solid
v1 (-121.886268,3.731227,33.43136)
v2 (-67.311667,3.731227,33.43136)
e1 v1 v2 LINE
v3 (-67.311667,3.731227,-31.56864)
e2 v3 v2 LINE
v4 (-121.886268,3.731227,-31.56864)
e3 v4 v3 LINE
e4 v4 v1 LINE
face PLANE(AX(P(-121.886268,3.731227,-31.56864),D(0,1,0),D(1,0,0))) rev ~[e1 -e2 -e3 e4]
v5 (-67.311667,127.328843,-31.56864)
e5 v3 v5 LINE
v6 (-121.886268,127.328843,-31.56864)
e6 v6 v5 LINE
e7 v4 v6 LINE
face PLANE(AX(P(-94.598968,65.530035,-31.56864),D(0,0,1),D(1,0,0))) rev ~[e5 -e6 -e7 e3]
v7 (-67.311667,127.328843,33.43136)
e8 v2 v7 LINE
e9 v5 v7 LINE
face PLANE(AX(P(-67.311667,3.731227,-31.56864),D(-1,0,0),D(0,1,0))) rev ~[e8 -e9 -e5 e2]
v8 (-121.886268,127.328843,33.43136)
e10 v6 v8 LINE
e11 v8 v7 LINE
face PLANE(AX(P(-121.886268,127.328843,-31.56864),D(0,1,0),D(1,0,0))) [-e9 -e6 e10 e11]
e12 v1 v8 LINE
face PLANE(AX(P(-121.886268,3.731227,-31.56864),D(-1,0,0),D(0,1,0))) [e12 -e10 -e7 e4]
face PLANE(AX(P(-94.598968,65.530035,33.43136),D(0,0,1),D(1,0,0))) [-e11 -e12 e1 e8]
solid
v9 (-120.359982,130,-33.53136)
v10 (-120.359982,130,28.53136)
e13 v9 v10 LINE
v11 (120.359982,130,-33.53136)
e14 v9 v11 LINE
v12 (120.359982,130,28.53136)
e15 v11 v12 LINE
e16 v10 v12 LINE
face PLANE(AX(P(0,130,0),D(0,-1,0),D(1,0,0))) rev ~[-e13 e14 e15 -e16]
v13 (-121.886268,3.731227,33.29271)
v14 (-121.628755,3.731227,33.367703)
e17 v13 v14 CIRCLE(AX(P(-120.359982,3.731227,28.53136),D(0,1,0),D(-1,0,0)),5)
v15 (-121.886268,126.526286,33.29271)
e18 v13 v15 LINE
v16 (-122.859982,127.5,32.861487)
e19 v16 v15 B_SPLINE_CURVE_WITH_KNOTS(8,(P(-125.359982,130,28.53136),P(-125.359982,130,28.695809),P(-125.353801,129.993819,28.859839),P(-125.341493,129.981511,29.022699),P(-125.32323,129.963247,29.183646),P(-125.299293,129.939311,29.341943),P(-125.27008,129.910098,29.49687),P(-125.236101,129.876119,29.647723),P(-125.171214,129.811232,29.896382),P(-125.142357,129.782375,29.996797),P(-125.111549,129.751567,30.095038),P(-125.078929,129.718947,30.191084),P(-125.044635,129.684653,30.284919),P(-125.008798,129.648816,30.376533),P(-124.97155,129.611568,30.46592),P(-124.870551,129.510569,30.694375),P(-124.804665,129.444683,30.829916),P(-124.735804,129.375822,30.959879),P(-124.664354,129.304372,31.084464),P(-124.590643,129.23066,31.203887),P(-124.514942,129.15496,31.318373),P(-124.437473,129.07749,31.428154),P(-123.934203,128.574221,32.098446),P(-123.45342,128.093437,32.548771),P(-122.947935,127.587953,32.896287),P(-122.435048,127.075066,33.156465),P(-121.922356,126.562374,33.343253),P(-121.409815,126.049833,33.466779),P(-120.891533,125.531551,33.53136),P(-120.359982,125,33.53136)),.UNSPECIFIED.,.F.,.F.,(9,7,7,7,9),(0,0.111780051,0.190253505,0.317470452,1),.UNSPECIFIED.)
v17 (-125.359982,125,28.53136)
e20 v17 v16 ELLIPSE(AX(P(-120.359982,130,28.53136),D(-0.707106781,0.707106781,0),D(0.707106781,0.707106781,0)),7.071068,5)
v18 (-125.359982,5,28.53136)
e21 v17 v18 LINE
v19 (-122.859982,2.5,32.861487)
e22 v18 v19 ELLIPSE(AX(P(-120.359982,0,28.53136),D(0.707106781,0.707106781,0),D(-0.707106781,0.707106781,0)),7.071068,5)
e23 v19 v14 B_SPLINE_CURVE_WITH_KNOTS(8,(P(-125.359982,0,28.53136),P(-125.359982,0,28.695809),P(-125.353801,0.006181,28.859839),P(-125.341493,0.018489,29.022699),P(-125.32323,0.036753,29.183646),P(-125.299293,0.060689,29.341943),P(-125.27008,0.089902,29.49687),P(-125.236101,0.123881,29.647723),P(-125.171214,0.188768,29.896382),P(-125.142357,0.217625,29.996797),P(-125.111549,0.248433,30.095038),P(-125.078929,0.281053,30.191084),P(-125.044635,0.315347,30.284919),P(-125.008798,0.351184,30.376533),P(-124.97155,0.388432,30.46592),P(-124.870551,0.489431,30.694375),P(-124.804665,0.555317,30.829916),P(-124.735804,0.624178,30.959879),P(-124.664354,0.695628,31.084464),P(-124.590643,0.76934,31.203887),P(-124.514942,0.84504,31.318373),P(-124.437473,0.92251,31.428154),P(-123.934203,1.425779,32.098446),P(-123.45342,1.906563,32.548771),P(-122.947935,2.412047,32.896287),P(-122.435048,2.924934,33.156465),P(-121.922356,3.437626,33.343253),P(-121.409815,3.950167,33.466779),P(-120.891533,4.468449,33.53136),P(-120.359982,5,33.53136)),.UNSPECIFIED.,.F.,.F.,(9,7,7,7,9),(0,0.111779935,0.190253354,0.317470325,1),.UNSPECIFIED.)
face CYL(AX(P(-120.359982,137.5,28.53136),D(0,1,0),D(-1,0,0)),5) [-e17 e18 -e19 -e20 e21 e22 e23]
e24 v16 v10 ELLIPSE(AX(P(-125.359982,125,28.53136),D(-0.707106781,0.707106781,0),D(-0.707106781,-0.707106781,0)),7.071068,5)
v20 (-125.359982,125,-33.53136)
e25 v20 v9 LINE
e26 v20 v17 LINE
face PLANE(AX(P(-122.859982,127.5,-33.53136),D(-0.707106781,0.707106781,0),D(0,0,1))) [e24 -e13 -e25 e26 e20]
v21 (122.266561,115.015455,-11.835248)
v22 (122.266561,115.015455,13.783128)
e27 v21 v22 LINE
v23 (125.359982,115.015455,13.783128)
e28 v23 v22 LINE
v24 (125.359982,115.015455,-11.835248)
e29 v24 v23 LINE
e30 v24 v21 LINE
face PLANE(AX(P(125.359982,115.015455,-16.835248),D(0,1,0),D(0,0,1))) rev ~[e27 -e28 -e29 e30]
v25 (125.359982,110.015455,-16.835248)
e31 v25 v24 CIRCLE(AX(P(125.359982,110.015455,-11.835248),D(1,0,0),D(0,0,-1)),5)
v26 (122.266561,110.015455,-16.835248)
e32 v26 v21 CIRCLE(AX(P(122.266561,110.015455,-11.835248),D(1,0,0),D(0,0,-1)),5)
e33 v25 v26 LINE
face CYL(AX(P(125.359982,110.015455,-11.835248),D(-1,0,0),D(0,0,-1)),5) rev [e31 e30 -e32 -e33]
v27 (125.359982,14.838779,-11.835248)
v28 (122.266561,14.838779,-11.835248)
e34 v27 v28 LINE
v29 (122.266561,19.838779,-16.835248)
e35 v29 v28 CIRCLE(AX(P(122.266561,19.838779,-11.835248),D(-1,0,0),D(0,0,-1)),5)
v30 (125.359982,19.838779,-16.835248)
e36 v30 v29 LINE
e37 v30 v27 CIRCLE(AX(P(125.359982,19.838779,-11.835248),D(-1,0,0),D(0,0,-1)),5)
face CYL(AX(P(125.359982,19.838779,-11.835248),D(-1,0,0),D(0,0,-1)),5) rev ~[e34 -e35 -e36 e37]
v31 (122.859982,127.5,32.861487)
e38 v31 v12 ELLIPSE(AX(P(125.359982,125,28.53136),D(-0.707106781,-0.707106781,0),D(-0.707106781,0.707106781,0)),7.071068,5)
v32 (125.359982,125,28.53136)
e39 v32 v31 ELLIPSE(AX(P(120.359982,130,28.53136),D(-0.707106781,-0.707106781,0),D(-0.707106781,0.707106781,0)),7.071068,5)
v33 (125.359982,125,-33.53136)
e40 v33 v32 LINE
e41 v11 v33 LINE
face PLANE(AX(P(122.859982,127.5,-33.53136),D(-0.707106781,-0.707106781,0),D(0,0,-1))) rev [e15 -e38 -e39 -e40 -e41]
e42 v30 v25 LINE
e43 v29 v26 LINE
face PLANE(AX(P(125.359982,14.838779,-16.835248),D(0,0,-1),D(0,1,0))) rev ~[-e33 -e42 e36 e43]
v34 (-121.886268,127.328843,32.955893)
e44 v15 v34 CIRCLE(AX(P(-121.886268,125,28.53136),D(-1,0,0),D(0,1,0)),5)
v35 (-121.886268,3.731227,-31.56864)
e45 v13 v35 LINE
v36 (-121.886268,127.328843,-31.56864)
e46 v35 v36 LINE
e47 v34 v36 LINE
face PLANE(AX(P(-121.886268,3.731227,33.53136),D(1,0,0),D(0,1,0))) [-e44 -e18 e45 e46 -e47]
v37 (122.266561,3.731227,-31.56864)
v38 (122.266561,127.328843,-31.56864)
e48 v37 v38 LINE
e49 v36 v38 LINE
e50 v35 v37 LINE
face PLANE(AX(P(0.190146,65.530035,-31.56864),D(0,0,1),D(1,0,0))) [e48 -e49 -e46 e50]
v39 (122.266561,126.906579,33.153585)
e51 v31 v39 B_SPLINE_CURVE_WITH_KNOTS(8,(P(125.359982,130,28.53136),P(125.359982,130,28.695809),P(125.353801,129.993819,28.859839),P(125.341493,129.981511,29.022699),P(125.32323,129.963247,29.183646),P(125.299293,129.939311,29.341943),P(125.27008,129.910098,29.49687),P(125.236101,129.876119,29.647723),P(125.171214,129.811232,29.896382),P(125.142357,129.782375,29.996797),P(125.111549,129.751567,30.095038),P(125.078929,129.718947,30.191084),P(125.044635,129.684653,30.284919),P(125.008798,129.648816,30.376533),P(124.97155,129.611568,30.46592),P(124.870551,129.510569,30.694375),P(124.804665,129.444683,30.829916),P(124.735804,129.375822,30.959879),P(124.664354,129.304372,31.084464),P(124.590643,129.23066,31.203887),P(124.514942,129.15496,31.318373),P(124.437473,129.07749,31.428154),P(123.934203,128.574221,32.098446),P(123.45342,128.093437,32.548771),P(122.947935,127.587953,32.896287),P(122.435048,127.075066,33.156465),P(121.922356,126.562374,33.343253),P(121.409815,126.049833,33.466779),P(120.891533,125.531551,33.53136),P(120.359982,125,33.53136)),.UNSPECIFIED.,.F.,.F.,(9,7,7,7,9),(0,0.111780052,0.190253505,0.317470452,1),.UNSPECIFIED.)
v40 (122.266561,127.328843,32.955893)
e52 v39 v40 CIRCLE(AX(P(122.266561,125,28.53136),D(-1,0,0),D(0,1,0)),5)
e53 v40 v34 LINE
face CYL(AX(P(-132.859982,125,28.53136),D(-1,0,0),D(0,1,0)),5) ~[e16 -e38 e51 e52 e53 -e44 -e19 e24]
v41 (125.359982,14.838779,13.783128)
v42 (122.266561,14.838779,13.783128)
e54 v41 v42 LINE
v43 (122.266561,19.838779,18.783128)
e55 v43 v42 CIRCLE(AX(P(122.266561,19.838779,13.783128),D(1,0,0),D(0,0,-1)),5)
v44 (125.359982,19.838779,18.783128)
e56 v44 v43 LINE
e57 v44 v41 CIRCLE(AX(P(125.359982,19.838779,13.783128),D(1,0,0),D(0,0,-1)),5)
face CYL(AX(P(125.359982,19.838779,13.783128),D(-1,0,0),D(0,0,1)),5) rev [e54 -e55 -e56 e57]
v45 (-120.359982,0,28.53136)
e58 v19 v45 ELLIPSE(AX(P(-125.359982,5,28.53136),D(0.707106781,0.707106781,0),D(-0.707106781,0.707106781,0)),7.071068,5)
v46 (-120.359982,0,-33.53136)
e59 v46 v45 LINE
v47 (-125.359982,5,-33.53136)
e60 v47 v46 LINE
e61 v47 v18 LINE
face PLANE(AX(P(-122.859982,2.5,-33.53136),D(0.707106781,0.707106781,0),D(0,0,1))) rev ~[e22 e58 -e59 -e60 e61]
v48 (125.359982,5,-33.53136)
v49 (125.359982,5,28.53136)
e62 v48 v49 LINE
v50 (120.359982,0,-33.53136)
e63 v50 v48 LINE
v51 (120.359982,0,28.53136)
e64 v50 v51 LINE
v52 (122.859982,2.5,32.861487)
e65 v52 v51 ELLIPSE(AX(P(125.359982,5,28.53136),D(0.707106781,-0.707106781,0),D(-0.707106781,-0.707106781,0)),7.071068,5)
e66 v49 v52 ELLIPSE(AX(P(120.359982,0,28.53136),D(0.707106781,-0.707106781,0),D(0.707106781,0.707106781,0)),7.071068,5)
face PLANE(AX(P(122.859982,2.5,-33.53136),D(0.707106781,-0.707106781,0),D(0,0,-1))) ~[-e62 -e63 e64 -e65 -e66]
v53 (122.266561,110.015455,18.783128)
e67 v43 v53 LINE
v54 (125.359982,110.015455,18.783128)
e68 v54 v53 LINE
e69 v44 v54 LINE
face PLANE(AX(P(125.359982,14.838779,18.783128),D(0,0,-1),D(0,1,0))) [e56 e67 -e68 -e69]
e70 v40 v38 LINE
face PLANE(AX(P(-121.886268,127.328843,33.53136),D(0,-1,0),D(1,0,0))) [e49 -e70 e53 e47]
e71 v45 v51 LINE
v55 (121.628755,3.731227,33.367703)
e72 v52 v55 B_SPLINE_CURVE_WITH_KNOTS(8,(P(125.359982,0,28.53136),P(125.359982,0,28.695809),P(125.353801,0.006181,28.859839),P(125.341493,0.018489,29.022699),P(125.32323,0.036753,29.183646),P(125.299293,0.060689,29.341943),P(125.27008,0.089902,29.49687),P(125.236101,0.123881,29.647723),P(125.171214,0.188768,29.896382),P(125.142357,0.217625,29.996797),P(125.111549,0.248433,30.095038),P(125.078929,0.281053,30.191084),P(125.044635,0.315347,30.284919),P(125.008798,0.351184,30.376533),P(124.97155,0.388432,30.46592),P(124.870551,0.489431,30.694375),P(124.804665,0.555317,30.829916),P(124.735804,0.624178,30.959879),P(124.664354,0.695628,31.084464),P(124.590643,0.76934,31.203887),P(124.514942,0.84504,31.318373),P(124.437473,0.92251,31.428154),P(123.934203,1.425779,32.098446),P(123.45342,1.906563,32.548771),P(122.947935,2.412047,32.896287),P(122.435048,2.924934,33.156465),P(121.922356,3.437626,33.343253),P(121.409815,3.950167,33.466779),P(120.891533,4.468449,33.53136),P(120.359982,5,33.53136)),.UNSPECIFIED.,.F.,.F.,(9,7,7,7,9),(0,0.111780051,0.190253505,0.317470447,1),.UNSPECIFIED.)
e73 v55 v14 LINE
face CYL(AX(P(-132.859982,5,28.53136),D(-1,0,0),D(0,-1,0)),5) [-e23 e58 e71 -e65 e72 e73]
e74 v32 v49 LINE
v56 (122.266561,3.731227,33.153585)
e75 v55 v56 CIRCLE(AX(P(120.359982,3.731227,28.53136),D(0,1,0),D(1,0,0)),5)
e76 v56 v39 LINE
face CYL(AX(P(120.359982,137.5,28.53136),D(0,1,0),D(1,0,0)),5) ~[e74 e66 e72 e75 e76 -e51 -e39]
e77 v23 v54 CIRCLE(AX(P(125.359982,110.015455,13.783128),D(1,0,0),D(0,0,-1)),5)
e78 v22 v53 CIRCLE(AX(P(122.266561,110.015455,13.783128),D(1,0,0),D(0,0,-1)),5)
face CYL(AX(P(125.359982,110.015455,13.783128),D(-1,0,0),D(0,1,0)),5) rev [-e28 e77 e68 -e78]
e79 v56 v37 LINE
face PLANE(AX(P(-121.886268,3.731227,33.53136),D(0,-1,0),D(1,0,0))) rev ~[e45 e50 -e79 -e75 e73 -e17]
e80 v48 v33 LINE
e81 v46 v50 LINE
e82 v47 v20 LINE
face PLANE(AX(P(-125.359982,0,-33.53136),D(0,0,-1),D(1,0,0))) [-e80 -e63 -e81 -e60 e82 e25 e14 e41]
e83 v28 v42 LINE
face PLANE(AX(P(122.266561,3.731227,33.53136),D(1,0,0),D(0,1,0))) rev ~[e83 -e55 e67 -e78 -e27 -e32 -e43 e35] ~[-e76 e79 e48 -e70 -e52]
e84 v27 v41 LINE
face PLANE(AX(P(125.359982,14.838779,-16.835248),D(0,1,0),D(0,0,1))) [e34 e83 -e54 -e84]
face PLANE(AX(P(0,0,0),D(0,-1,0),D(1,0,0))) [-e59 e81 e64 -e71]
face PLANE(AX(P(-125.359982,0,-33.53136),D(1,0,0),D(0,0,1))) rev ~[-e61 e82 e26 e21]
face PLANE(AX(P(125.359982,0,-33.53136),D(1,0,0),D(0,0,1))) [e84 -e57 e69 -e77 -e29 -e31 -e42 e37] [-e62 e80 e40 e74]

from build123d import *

# Parameters (mm, degrees)
F0_W        = 250.7199645042
F0_H        = 67.0627206564
F1_DEPTH    = 130
F2_W        = 244.152829051
F2_H        = 123.597616097
F3_DEPTH    = 65.1
F4_SIZE     = 5
F5_T1_DEPTH = 145
F5_T3_DEPTH = 265.7199645042
F6_W        = 100.1766752452
F6_H        = 35.6183759868
F7_DEPTH    = 25
F8_R        = 5
F9_W        = 54.5746013522
F9_H        = 123.597616097
F10_DEPTH   = 65


# Not quite as in the source:
# - a fillet or chamfer that OpenCascade refuses, or shapes differently, is made with other operations: its cross-section is extruded or revolved along the edge and cut away or added


with BuildPart() as f1:
    # F0 (on Front) → F1 (new body)
    with BuildSketch(Plane.XZ):
        Rectangle(F0_W, F0_H)
    extrude(amount=-F1_DEPTH)

    # F2 (on face) → F3 (cut)
    with BuildSketch(Plane.XY.offset(33.5313603282)):
        with Locations((0.1901462674, 65.5300348299)):
            Rectangle(F2_W, F2_H)
    extrude(amount=-F3_DEPTH, mode=Mode.SUBTRACT)

    # F4
    f4_edges = [f1.edges().sort_by_distance(p)[0] for p in [
        (-125.359982, 0, 0),
        (-125.359982, 130, 0),
        (125.359982, 130, 0),
        (125.359982, 0, 0),
    ]]
    chamfer(f4_edges, length=F4_SIZE)

    # F5: fillet of radius 5 on 4 edges, made by hand

    # F5_s2 → F5_t1 (cut)
    with BuildSketch(Plane.XZ.offset(-137.5)):
        with BuildLine():
            ThreePointArc((-125.3599822521, 28.5313603282), (-123.8955161581, 32.0668942341), (-120.3599822521, 33.5313603282))
            Line((-120.3599822521, 33.5313603282), (-125.3599822521, 33.5313603282))
            Line((-125.3599822521, 33.5313603282), (-125.3599822521, 28.5313603282))
        make_face()
        with BuildLine():
            ThreePointArc((125.3599822521, 28.5313603282), (123.8955161581, 32.0668942341), (120.3599822521, 33.5313603282))
            Line((120.3599822521, 33.5313603282), (125.3599822521, 33.5313603282))
            Line((125.3599822521, 33.5313603282), (125.3599822521, 28.5313603282))
        make_face()
    extrude(amount=F5_T1_DEPTH, mode=Mode.SUBTRACT)

    # F5_s4 → F5_t3 (cut)
    with BuildSketch(Plane.YZ.offset(-132.8599822521)):
        with BuildLine():
            ThreePointArc((130, 28.5313603282), (128.5355339059, 32.0668942341), (125, 33.5313603282))
            Line((125, 33.5313603282), (130, 33.5313603282))
            Line((130, 33.5313603282), (130, 28.5313603282))
        make_face()
        with BuildLine():
            ThreePointArc((0, 28.5313603282), (1.4644660941, 32.0668942341), (5, 33.5313603282))
            Line((5, 33.5313603282), (0, 33.5313603282))
            Line((0, 33.5313603282), (0, 28.5313603282))
        make_face()
    extrude(amount=F5_T3_DEPTH, mode=Mode.SUBTRACT)

    # F6 (on face) → F7 (cut)
    with BuildSketch(Plane.YZ.offset(125.3599822521)):
        with Locations((64.9271169677, 0.9739398956)):
            Rectangle(F6_W, F6_H)
    extrude(amount=-F7_DEPTH, mode=Mode.SUBTRACT)

    # F8
    f8_edges = [f1.edges().sort_by_distance(p)[0] for p in [
        (123.813272, 14.838779, 18.783128),
        (123.813272, 115.015455, 18.783128),
        (123.813272, 115.015455, -16.835248),
        (123.813272, 14.838779, -16.835248),
    ]]
    fillet(f8_edges, radius=F8_R)


with BuildPart() as f10:
    # F9 (on face) → F10 (new body)
    with BuildSketch(Plane.XY.offset(-31.5686396718)):
        with Locations((-94.598967582, 65.5300348299)):
            Rectangle(F9_W, F9_H)
    extrude(amount=F10_DEPTH)


solid = Compound([f1.part, f10.part])
